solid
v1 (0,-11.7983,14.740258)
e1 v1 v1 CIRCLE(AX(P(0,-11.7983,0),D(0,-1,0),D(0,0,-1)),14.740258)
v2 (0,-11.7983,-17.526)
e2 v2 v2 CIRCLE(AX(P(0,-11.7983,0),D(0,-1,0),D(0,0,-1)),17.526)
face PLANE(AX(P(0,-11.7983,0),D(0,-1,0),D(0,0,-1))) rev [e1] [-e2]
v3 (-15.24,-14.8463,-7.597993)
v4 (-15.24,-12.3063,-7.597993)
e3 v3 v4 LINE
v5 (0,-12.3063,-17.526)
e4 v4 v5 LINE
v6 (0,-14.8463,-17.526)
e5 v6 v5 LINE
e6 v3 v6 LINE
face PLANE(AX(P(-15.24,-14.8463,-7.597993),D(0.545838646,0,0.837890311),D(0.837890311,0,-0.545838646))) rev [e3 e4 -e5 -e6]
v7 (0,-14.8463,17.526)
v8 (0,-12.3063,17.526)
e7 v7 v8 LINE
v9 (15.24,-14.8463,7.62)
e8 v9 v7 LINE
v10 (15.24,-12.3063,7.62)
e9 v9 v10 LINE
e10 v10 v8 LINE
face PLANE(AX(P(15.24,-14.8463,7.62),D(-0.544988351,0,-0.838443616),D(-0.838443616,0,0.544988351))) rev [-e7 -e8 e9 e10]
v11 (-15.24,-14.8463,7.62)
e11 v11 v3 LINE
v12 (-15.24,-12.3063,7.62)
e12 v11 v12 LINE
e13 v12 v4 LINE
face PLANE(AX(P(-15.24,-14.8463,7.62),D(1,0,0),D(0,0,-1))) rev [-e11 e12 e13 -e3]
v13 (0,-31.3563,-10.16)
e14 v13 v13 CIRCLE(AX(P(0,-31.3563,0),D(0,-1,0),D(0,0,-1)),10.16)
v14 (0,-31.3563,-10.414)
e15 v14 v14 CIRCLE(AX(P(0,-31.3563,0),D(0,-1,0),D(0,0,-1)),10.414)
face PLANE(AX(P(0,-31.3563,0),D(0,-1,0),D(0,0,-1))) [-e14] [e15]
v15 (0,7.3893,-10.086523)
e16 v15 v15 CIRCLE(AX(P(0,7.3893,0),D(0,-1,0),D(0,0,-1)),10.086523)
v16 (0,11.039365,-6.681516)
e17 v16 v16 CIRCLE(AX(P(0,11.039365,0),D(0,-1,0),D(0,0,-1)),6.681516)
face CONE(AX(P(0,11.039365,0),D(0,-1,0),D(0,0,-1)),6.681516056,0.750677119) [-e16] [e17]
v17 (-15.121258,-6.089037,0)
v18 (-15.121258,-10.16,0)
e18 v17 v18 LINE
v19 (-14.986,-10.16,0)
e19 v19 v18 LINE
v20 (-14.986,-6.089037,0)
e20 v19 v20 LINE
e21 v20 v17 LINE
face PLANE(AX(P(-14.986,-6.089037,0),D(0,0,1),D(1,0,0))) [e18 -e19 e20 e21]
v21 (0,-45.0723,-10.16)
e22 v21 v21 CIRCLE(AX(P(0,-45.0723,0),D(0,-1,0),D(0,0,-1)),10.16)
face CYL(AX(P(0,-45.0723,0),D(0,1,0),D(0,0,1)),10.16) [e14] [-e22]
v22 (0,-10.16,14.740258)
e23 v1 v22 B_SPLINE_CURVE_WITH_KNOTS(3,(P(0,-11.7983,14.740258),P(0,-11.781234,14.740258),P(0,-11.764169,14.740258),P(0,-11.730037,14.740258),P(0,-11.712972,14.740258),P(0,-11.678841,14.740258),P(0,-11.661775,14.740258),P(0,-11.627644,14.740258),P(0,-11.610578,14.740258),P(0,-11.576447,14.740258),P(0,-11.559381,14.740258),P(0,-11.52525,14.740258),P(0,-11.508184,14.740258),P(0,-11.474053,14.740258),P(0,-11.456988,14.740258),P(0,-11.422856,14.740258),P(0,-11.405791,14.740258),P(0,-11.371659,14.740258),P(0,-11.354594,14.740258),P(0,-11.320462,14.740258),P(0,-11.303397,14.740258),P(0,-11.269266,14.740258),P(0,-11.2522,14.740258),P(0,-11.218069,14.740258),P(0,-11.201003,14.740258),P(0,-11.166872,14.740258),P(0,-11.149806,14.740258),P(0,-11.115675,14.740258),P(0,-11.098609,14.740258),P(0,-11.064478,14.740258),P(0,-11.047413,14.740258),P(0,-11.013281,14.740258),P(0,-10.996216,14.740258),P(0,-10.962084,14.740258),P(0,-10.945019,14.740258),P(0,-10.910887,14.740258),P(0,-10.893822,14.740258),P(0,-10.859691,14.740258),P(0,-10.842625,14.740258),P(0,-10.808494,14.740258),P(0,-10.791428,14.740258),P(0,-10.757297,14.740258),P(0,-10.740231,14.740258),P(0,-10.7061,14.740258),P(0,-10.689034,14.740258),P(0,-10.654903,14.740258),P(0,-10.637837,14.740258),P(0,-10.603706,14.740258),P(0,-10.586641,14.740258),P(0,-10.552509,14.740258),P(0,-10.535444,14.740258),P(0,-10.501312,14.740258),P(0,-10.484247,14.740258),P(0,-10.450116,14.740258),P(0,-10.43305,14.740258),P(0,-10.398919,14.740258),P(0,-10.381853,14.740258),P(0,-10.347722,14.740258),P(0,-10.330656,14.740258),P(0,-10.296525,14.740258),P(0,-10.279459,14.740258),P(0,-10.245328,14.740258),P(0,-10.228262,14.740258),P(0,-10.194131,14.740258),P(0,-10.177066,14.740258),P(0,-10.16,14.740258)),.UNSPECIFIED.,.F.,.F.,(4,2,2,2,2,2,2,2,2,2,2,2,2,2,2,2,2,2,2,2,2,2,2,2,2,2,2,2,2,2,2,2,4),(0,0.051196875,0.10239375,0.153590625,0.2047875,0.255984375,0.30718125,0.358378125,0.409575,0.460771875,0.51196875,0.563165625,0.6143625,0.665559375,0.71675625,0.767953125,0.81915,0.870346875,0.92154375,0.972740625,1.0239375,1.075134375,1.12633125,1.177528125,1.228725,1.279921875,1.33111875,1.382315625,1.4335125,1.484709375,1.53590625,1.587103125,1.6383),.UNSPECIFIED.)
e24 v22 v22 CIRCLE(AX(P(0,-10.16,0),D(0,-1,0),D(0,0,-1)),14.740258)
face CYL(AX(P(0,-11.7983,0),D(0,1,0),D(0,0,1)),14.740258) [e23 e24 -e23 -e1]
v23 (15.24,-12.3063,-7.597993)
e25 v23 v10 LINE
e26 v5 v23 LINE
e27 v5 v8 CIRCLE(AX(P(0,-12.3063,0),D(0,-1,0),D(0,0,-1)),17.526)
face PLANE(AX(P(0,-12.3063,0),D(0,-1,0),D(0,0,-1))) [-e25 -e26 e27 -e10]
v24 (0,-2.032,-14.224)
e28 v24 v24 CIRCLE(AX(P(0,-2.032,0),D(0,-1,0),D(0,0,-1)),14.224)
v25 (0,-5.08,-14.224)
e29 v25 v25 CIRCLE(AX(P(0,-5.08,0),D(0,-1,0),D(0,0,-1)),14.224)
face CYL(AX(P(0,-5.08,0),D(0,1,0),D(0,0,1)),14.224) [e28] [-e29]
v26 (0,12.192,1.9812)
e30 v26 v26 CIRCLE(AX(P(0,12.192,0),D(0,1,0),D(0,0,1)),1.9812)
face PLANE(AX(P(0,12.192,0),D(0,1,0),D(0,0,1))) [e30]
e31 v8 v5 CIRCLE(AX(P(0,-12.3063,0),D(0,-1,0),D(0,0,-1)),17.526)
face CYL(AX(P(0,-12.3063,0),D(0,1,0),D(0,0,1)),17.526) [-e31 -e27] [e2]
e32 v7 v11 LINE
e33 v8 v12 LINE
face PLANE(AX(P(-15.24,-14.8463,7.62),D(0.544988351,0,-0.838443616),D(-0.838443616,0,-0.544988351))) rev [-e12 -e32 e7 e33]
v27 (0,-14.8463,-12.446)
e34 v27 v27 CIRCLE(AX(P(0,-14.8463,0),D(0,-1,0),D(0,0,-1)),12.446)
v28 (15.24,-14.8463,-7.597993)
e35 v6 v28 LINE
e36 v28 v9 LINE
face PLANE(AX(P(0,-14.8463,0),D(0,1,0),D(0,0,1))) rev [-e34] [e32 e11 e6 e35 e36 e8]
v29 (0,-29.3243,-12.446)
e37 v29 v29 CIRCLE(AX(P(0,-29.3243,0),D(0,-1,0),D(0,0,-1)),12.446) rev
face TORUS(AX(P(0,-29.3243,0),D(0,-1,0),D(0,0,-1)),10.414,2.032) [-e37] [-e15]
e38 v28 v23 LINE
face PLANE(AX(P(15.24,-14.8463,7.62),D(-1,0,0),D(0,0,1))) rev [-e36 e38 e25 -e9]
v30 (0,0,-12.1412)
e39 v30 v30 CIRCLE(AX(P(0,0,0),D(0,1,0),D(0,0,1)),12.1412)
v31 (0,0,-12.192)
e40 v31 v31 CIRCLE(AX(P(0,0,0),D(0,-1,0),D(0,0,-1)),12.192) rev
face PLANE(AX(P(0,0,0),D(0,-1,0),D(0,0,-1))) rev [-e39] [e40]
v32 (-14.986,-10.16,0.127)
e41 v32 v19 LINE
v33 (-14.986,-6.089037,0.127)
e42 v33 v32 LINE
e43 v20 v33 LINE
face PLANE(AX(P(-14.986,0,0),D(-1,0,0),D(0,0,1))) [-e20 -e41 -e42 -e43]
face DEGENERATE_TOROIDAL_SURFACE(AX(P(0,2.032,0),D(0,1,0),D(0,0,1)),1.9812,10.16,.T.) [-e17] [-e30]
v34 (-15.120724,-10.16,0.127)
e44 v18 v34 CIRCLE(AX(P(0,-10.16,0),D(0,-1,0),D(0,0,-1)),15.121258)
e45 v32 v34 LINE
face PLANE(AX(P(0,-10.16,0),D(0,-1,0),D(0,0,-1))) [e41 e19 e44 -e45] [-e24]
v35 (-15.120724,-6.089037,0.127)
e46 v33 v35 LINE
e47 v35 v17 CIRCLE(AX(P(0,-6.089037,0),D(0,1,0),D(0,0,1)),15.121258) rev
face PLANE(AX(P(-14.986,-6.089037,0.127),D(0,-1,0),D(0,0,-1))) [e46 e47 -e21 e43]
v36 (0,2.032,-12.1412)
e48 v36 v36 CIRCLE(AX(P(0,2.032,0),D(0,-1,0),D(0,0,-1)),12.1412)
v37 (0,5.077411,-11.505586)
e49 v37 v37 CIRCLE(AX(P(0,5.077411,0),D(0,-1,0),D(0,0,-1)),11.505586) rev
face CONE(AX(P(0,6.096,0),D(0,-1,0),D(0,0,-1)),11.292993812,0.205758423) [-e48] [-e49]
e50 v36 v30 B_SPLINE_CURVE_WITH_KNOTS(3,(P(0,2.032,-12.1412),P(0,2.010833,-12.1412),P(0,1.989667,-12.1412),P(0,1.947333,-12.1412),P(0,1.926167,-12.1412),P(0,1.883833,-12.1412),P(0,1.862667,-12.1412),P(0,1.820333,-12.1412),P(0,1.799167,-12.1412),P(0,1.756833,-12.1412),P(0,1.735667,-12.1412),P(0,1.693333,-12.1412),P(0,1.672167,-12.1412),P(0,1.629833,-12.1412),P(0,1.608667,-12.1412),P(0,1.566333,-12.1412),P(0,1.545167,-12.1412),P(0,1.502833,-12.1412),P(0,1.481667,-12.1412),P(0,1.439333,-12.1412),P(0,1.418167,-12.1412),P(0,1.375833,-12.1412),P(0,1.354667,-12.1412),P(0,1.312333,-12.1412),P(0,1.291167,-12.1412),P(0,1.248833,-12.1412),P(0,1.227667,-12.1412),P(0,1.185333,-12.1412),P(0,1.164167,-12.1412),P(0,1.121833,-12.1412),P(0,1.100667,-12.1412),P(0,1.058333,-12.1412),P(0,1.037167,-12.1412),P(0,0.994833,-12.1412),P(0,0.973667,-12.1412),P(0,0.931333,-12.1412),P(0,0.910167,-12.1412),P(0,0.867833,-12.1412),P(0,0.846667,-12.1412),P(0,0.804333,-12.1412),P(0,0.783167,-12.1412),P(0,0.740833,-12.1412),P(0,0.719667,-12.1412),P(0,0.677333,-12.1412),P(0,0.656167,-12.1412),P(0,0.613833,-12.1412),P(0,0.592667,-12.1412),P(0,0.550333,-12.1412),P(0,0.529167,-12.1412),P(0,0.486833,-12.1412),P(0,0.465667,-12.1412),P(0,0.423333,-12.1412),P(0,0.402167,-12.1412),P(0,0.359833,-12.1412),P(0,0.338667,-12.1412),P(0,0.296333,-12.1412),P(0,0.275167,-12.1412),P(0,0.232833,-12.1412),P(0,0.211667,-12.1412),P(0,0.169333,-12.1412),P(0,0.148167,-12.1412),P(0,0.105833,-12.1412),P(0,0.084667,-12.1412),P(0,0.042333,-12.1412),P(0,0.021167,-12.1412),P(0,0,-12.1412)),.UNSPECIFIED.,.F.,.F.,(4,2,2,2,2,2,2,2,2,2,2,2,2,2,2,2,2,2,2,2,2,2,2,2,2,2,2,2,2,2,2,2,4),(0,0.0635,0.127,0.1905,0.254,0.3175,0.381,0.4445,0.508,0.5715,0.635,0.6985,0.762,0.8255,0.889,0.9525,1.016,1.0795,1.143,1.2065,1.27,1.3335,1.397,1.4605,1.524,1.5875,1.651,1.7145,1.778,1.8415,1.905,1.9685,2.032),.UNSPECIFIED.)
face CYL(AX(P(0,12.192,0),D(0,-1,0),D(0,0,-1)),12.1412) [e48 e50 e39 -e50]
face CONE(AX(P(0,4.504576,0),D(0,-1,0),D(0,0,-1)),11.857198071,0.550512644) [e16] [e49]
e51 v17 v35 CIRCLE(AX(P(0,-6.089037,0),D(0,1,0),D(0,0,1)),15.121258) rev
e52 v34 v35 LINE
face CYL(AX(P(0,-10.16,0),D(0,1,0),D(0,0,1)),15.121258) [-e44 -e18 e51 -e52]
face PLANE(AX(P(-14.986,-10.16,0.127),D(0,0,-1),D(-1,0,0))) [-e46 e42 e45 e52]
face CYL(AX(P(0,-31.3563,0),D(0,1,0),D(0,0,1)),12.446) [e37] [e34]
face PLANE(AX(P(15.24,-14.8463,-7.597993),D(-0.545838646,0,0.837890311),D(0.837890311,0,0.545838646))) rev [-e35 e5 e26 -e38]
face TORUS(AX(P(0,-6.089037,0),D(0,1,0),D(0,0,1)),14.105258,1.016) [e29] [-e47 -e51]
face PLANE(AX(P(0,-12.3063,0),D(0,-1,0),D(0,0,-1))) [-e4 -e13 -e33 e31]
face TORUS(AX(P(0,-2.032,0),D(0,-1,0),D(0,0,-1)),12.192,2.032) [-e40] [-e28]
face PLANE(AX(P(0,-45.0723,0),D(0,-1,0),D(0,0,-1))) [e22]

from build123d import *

# Parameters (mm, degrees)
SKETCH1_R           = 12.1412
BOSS_EXTRUDE1_DEPTH = 12.192
FILLET1_R           = 10.16
SKETCH3_R           = 14.224
BOSS_EXTRUDE2_DEPTH = 5.08
FILLET6_R           = 2.032
SKETCH8_R           = 15.121257553
BOSS_EXTRUDE3_DEPTH = 5.08
FILLET7_R           = 1.016
SKETCH9_W           = 0.127
SKETCH9_H           = 4.070962721
CUT_EXTRUDE1_DEPTH  = 0.254
SKETCH13_R          = 14.74025754
BOSS_EXTRUDE4_DEPTH = 1.6383
SKETCH14_R          = 17.526
BOSS_EXTRUDE5_DEPTH = 0.508
BOSS_EXTRUDE6_DEPTH = 2.54
SKETCH16_R          = 12.446
BOSS_EXTRUDE7_DEPTH = 16.51
SKETCH17_R          = 10.16
BOSS_EXTRUDE8_DEPTH = 13.716
FILLET8_R           = 2.032


with BuildPart() as part:
    # Sketch1 → Boss-Extrude1 (new body)
    with BuildSketch(Plane(origin=(0, 0, 0), x_dir=(1, 0, 0), z_dir=(0, 1, 0))):
        with Locations(Location((0, 0, 0), (0, 0, 90))):
            Circle(SKETCH1_R)
    extrude(amount=BOSS_EXTRUDE1_DEPTH)

    # Fillet1
    fillet1_edges = [part.edges().sort_by_distance(p)[0] for p in [
        (0, 12.192, 12.1412),
    ]]
    fillet(fillet1_edges, radius=FILLET1_R)

    # Sketch3 → Boss-Extrude2 (add)
    with BuildSketch(Plane.XZ):
        with Locations(Location((0, 0, 0), (0, 0, 270))):
            Circle(SKETCH3_R)
    extrude(amount=BOSS_EXTRUDE2_DEPTH)

    # Sketch4 → Cut-Revolve1 (revolve, cut)
    with BuildSketch(Plane(origin=(0, 0, 0), x_dir=(0, 0, -1), z_dir=(1, 0, 0))):
        Polygon((11.292993812, 6.096), (6.681516056, 11.039365263), (11.292993812, 11.039365263), align=None)
    revolve(axis=Axis((0, 0, 0), (0, 1, 0)), mode=Mode.SUBTRACT)

    # Sketch5 → Cut-Revolve2 (revolve, cut)
    with BuildSketch(Plane(origin=(0, 0, 0), x_dir=(0, 0, -1), z_dir=(1, 0, 0))):
        Polygon((12.1412, 2.032), (11.292993812, 6.096), (14.961110493, 2.032), align=None)
    revolve(axis=Axis((0, 0, 0), (0, 1, 0)), mode=Mode.SUBTRACT)

    # Sketch7 → Cut-Revolve3 (revolve, cut)
    with BuildSketch(Plane.XY, mode=Mode.PRIVATE) as cut_revolve3_sk:
        Polygon((-10.086523159, 7.389300203), (-11.857198071, 4.504575846), (-11.857198071, 7.389300203), align=None)
    revolve(cut_revolve3_sk.sketch.rotate(Axis((0, 0, 0), (0, 1, 0)), 270), axis=Axis((0, 0, 0), (0, 1, 0)), mode=Mode.SUBTRACT)

    # Fillet6
    fillet6_edges = [part.edges().sort_by_distance(p)[0] for p in [
        (0, 0, 14.224),
    ]]
    fillet(fillet6_edges, radius=FILLET6_R)

    # Sketch8 → Boss-Extrude3 (add)
    with BuildSketch(Plane.XZ.offset(5.08)):
        with Locations(Location((0, 0, 0), (0, 0, 270))):
            Circle(SKETCH8_R)
    extrude(amount=BOSS_EXTRUDE3_DEPTH)

    # Fillet7
    # the kernel refuses this fillet: 1.016 mm, written as the material it takes off along each edge
    with BuildSketch(Plane(origin=(0, -5.08, 0), x_dir=(0, 0, -1), z_dir=(-1, 0, 0))) as fillet7_piece_1:
        with BuildLine():
            CenterArc((14.105257553, 1.009037279), FILLET7_R, 276.711639073, 83.288360927)
            Line((14.224, 0), (14.226374849, -0.020180746))
            ThreePointArc((14.226374849, -0.020180746), (14.672628776, -0.02032), (15.121257553, -0.02032))
            Line((15.121257553, -0.02032), (15.141577553, 0))
            Line((15.141577553, 0), (15.141577553, 1.009037279))
            Line((15.141577553, 1.009037279), (15.121257553, 1.009037279))
        make_face()
    revolve(axis=Axis((0, -5.08, 0), (0, -1, 0)), mode=Mode.SUBTRACT)

    # Sketch9 → Cut-Extrude1 (cut)
    with BuildSketch(Plane(origin=(-15.24, 0, 0), x_dir=(0, 0, -1), z_dir=(1, 0, 0))):
        with Locations((-0.0635, -8.124518639)):
            Rectangle(SKETCH9_W, SKETCH9_H)
    extrude(amount=CUT_EXTRUDE1_DEPTH, mode=Mode.SUBTRACT)

    # Sketch13 → Boss-Extrude4 (add)
    with BuildSketch(Plane.XZ.offset(10.16)):
        with Locations(Location((0, 0, 0), (0, 0, 90))):
            Circle(SKETCH13_R)
    extrude(amount=BOSS_EXTRUDE4_DEPTH)

    # Sketch14 → Boss-Extrude5 (add)
    with BuildSketch(Plane.XZ.offset(11.7983)):
        with Locations(Location((0, 0, 0), (0, 0, 270))):
            Circle(SKETCH14_R)
    extrude(amount=BOSS_EXTRUDE5_DEPTH)

    # Sketch15 → Boss-Extrude6 (add)
    with BuildSketch(Plane.XZ.offset(12.3063)):
        Polygon((15.24, 7.62), (15.24, -7.597992884), (0, -17.526), (-15.24, -7.597992884), (-15.24, 7.62), (0, 17.526), align=None)
    extrude(amount=BOSS_EXTRUDE6_DEPTH)

    # Sketch16 → Boss-Extrude7 (add)
    with BuildSketch(Plane.XZ.offset(14.8463)):
        with Locations(Location((0, 0, 0), (0, 0, 270))):
            Circle(SKETCH16_R)
    extrude(amount=BOSS_EXTRUDE7_DEPTH)

    # Sketch17 → Boss-Extrude8 (add)
    with BuildSketch(Plane.XZ.offset(31.3563)):
        with Locations(Location((0, 0, 0), (0, 0, 270))):
            Circle(SKETCH17_R)
    extrude(amount=BOSS_EXTRUDE8_DEPTH)

    # Fillet8
    fillet8_edges = [part.edges().sort_by_distance(p)[0] for p in [
        (0, -31.3563, 12.446),
    ]]
    fillet(fillet8_edges, radius=FILLET8_R)


solid = part.part
